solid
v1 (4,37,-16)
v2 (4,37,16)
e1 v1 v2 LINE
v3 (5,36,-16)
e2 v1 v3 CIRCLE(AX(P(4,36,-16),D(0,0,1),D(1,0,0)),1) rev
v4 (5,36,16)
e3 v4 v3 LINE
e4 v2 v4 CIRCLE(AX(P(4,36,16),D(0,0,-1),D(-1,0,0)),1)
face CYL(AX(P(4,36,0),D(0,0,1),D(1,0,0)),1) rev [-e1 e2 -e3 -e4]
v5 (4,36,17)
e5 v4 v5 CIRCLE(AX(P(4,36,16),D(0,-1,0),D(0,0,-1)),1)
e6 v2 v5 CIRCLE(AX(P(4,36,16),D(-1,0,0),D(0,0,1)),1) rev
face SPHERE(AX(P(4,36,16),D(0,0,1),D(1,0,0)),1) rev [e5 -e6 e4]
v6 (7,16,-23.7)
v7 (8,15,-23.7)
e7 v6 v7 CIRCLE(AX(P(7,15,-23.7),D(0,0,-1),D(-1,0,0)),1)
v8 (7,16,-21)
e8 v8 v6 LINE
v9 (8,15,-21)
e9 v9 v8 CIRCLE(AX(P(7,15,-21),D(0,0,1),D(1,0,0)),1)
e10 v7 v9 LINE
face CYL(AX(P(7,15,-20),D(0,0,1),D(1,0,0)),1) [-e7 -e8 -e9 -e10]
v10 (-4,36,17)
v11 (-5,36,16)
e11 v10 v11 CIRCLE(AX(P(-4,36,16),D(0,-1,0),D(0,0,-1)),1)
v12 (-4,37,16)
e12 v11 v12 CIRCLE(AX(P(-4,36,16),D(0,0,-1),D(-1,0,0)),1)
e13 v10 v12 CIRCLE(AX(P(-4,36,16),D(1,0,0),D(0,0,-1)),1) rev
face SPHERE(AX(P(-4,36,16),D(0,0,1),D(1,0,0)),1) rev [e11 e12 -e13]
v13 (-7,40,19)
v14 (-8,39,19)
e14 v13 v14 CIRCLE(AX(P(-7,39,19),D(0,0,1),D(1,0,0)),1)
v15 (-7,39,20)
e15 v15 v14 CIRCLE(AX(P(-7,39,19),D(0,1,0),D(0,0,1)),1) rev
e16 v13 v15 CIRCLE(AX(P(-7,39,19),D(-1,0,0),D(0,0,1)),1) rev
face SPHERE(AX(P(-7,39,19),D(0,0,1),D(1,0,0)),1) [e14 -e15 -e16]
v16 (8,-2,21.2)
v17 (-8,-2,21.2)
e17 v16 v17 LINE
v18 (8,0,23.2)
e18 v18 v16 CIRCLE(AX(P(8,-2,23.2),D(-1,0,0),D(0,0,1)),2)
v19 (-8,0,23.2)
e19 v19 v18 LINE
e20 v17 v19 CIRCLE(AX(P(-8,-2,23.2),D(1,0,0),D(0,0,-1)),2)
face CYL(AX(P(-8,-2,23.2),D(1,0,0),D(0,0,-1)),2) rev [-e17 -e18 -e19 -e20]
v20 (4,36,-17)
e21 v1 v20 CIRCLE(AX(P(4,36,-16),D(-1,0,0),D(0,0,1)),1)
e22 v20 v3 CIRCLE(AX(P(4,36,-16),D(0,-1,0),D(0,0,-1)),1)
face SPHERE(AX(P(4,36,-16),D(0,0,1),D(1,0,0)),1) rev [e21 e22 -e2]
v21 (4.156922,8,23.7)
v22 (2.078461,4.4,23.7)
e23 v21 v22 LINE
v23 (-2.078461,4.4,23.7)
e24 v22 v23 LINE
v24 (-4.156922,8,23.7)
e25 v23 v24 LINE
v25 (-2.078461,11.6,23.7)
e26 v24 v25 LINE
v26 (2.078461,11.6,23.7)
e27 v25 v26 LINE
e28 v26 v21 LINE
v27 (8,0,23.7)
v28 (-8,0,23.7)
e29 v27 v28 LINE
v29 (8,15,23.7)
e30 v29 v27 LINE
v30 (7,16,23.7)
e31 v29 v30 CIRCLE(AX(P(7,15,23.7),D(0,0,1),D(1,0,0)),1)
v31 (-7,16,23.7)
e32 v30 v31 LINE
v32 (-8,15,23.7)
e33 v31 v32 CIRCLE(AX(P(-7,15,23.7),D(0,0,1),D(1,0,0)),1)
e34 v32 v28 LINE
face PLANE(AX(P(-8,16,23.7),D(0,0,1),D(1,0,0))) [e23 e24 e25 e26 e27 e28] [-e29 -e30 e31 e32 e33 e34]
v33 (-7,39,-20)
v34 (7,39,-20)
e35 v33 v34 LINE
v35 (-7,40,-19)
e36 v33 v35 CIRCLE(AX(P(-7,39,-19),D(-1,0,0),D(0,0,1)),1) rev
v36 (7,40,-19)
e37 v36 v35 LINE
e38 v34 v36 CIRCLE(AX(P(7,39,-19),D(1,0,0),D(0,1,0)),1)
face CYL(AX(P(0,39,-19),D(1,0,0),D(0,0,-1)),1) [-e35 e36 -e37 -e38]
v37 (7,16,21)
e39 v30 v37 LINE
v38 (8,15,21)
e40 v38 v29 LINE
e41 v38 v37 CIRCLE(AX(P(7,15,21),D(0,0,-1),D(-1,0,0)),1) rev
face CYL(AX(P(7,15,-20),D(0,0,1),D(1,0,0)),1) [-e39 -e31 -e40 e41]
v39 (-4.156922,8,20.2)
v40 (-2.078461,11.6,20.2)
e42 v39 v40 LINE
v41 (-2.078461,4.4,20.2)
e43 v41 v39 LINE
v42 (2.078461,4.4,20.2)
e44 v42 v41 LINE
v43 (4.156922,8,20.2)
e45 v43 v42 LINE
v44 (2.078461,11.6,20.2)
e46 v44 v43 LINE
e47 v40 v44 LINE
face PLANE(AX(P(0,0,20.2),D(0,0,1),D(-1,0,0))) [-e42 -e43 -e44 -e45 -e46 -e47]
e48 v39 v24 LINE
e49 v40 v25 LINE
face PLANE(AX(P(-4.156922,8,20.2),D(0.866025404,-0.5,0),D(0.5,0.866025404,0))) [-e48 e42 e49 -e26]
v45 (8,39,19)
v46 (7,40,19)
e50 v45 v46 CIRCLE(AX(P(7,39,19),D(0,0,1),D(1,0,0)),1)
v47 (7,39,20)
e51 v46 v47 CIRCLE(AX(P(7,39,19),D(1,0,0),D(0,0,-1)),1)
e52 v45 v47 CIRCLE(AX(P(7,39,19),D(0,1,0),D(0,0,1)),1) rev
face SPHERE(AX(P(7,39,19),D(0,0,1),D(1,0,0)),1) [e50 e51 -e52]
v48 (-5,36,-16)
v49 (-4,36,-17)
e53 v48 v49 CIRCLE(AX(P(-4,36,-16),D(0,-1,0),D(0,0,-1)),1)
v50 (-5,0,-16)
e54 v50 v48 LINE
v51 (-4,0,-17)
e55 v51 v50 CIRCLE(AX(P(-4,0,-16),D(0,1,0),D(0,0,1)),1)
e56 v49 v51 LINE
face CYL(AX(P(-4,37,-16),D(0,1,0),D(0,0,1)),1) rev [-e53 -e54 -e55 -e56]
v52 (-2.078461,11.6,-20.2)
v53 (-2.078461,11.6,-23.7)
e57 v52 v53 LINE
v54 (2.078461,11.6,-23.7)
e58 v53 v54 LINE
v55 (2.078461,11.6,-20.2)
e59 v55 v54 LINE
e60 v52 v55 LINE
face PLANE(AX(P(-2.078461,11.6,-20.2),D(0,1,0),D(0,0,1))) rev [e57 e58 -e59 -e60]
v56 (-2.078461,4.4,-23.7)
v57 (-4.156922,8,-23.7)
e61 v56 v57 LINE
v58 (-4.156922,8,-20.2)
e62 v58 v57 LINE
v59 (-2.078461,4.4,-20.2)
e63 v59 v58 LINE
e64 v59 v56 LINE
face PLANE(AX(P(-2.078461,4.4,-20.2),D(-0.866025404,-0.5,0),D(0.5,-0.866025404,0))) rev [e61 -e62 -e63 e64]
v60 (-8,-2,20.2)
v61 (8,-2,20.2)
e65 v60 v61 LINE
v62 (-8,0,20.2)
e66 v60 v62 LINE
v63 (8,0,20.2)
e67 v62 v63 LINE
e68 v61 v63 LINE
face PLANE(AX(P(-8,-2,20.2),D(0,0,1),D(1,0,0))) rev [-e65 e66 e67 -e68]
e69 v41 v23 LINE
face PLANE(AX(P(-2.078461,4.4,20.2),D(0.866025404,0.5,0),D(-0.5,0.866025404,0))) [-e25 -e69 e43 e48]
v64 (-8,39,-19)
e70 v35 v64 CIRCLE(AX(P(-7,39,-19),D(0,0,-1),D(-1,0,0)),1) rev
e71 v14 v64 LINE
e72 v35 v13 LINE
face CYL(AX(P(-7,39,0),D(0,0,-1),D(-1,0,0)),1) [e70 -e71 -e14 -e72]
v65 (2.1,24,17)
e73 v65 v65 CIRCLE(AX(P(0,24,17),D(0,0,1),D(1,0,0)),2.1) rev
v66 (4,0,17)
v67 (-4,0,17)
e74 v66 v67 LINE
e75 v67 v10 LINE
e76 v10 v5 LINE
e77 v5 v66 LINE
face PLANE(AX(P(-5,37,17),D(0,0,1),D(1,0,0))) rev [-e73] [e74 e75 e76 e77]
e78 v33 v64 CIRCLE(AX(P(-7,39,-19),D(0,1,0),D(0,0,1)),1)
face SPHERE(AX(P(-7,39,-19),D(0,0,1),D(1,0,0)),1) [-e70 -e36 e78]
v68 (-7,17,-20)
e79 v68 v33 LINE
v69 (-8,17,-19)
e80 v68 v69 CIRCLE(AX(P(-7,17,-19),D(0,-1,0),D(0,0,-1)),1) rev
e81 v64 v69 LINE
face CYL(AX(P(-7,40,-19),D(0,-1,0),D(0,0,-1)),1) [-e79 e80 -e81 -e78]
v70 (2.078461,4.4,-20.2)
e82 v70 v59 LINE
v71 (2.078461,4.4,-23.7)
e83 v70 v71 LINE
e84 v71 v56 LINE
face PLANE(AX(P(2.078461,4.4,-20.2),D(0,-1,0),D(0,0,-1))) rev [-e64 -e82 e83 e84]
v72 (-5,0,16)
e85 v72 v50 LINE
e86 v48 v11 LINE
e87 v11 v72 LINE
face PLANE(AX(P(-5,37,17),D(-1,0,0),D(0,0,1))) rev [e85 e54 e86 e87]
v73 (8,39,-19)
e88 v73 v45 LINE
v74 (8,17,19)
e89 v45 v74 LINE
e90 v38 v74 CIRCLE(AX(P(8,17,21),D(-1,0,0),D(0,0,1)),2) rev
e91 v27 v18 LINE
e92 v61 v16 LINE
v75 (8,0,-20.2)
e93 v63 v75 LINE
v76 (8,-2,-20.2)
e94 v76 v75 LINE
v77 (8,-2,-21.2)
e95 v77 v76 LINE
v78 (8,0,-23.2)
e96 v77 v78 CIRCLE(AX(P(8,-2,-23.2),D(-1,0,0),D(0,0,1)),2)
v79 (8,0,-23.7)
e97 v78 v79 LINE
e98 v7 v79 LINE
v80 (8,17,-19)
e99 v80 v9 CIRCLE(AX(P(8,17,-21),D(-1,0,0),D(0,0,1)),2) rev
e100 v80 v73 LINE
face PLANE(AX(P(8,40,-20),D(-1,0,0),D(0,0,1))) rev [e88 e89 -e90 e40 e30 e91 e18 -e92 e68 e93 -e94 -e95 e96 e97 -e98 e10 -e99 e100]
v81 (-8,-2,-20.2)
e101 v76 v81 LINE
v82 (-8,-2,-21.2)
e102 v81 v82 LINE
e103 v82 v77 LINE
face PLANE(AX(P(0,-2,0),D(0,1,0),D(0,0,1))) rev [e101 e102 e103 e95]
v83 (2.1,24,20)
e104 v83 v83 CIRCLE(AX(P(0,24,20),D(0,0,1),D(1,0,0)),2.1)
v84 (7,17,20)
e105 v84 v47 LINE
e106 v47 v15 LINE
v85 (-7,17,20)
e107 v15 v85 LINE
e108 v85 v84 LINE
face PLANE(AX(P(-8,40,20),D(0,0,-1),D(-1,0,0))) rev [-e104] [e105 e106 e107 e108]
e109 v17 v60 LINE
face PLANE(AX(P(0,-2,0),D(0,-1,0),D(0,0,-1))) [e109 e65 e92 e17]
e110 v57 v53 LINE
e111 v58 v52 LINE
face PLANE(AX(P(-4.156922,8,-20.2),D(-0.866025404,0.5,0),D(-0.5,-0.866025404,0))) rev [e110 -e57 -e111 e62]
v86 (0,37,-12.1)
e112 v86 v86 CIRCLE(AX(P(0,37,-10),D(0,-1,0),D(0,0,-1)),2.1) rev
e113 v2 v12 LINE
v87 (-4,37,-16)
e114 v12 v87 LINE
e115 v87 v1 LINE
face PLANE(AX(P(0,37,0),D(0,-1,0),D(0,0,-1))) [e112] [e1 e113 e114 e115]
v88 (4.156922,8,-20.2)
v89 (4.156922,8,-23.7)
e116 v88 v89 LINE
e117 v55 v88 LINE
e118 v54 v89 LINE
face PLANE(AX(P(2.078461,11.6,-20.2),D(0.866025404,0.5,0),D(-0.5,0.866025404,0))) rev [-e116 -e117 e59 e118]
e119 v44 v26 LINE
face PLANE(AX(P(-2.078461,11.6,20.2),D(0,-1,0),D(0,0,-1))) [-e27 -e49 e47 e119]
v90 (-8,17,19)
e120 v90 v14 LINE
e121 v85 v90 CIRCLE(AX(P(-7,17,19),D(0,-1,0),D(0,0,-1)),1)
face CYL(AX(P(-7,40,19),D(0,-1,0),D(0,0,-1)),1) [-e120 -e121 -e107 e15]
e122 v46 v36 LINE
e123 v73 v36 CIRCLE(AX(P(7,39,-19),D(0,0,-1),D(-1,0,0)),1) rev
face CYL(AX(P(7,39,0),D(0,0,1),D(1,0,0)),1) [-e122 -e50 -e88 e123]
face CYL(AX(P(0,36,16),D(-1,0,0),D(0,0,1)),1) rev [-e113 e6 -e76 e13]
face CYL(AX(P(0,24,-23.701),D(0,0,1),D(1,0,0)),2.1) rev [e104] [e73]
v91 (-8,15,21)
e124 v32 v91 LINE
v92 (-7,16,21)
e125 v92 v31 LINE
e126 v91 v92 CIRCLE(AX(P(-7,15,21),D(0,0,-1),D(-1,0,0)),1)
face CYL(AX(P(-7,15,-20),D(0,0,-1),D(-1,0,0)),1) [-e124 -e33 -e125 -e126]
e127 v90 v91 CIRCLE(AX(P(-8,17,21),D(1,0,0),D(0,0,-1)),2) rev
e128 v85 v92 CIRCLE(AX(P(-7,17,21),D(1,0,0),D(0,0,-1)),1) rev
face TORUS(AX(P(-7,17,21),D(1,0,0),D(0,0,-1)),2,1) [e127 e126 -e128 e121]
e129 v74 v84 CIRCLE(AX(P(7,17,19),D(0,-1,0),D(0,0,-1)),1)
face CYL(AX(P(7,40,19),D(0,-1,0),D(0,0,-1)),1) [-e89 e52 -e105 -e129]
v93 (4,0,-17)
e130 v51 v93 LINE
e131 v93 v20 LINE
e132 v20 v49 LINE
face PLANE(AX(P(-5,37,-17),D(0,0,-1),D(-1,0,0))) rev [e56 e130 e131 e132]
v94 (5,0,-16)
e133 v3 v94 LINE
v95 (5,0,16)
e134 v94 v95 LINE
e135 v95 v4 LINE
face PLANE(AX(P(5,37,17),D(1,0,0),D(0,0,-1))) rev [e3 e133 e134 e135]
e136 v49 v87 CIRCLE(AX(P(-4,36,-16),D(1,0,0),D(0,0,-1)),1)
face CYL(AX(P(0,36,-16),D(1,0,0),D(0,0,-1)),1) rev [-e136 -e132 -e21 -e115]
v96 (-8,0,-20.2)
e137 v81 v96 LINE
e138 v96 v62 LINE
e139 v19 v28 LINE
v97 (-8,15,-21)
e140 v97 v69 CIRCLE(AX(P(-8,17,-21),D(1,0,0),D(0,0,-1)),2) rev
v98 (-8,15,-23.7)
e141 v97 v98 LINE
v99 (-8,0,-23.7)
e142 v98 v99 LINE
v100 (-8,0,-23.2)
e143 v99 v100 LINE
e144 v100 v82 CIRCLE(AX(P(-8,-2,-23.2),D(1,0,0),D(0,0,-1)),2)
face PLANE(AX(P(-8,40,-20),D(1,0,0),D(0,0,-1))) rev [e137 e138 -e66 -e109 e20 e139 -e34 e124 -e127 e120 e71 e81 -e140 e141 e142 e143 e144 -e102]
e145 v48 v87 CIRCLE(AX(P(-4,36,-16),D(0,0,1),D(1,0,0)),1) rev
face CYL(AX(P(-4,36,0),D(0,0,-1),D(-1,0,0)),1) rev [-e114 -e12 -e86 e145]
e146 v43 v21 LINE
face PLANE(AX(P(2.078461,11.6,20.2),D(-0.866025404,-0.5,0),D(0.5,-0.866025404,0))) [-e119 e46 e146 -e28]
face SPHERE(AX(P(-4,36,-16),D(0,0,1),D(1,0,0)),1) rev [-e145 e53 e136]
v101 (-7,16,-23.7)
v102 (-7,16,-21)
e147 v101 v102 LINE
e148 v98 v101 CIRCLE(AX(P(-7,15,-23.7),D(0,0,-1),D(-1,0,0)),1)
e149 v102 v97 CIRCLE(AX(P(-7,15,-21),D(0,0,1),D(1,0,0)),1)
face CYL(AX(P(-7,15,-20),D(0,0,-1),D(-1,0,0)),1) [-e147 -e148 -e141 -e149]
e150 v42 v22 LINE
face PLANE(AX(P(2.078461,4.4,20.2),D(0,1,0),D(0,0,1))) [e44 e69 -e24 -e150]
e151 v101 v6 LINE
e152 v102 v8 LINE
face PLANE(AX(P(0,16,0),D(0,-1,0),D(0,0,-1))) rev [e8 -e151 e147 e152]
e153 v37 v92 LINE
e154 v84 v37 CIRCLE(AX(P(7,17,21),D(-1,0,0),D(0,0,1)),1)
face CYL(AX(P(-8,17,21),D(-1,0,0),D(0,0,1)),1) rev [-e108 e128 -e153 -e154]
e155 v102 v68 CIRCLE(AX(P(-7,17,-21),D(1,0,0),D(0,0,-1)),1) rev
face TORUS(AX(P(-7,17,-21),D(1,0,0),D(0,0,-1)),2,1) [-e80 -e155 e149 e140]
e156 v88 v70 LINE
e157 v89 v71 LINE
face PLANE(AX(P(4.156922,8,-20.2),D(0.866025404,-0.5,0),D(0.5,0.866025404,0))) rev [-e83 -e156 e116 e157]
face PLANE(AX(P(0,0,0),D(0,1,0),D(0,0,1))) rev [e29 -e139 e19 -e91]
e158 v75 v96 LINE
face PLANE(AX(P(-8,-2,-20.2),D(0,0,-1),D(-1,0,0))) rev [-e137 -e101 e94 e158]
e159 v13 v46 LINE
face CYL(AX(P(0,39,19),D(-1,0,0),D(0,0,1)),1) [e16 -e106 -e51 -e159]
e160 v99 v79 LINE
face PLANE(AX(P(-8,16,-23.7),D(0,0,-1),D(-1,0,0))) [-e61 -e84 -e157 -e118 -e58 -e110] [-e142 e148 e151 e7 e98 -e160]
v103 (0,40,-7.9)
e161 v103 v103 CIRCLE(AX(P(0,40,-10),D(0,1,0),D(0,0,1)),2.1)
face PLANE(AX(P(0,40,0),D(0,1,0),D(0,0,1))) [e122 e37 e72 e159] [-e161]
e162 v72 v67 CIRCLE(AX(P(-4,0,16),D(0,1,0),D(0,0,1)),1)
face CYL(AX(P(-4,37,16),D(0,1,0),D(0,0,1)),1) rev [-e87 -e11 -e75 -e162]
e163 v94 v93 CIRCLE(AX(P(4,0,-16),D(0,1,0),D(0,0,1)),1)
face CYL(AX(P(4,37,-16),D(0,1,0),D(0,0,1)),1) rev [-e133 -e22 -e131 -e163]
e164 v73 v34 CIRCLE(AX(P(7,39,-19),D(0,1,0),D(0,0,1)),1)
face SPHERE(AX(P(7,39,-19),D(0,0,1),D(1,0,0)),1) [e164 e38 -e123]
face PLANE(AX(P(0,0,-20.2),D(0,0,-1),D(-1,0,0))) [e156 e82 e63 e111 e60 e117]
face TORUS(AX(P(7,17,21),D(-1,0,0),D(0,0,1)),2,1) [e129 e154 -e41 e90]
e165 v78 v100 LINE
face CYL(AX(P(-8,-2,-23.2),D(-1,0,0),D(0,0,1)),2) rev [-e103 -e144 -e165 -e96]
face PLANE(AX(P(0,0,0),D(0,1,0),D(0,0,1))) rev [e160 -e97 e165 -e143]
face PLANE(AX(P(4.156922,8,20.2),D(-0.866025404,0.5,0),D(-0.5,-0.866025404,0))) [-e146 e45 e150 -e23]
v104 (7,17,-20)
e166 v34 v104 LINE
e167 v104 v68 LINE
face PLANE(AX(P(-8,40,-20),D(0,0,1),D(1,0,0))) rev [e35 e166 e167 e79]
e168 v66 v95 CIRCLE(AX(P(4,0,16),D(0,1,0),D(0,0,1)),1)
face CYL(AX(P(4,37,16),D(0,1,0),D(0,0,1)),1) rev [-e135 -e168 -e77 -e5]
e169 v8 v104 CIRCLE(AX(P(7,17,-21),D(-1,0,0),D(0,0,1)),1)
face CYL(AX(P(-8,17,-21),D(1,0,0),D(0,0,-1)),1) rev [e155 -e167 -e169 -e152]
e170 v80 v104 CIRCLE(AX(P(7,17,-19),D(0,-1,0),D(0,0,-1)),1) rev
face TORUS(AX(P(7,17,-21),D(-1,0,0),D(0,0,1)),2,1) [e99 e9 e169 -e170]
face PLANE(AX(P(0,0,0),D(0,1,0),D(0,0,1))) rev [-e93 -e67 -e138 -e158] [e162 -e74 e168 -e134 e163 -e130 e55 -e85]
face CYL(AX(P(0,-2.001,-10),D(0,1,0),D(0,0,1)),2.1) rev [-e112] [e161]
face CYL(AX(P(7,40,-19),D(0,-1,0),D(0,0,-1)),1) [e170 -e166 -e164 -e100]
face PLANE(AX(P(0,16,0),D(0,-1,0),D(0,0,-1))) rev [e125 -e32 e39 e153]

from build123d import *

# Parameters (mm, degrees)
SKETCH1_W           = 16
SKETCH1_H           = 40
BOSS_EXTRUDE1_DEPTH = 40
SKETCH2_W           = 16
SKETCH2_H           = 3.7
BOSS_EXTRUDE2_DEPTH = 16
SKETCH5_W           = 10
SKETCH5_H           = 34
CUT_EXTRUDE3_DEPTH  = 37
FILLET1_R           = 1
FILLET2_R           = 1
CUT_EXTRUDE6_DEPTH  = 3.5
SKETCH9_W           = 16
SKETCH9_H           = 1
BOSS_EXTRUDE3_DEPTH = 2
CUT_EXTRUDE7_REACH  = 61.78
SKETCH12_R          = 2.1
CUT_EXTRUDE8_REACH  = 50.884
SKETCH13_R          = 2.1
FILLET3_R           = 2


with BuildPart() as part:
    # Sketch1 → Boss-Extrude1 (new body)
    with BuildSketch(Plane(origin=(0, 0, 0), x_dir=(1, 0, 0), z_dir=(0, 1, 0))):
        Rectangle(SKETCH1_W, SKETCH1_H)
    extrude(amount=BOSS_EXTRUDE1_DEPTH)

    # Sketch2 → Boss-Extrude2 (add)
    with BuildSketch(Plane.XZ):
        with Locations((0, 21.85)):
            Rectangle(SKETCH2_W, SKETCH2_H)
        with Locations((0, -21.85)):
            Rectangle(SKETCH2_W, SKETCH2_H)
    extrude(amount=-BOSS_EXTRUDE2_DEPTH)

    # Sketch5 → Cut-Extrude3 (cut)
    with BuildSketch(Plane.XZ):
        Rectangle(SKETCH5_W, SKETCH5_H)
    extrude(amount=-CUT_EXTRUDE3_DEPTH, mode=Mode.SUBTRACT)

    # Fillet1
    fillet1_edges = [part.edges().sort_by_distance(p)[0] for p in [
        (8, 40, 0),
        (0, 40, -20),
        (-8, 16, 21.85),
        (8, 16, 21.85),
        (0, 16, 20),
        (-8, 16, -21.85),
        (0, 16, -20),
        (8, 16, -21.85),
        (-8, 40, 0),
        (0, 40, 20),
        (-8, 28, -20),
        (8, 28, -20),
        (8, 28, 20),
        (-8, 28, 20),
    ]]
    fillet(fillet1_edges, radius=FILLET1_R)

    # Fillet2
    fillet2_edges = [part.edges().sort_by_distance(p)[0] for p in [
        (-5, 37, 0),
        (-5, 18.5, -17),
        (0, 37, 17),
        (-5, 18.5, 17),
        (5, 37, 0),
        (5, 18.5, 17),
        (0, 37, -17),
        (5, 18.5, -17),
    ]]
    fillet(fillet2_edges, radius=FILLET2_R)

    # Sketch3 → Cut-Extrude6 (cut)
    with BuildSketch(Plane(origin=(0, 0, -23.7), x_dir=(-1, 0, 0), z_dir=(0, 0, -1))):
        Polygon((2.078460969, 11.6), (-2.078460969, 11.6), (-4.156921938, 8), (-2.078460969, 4.4), (2.078460969, 4.4), (4.156921938, 8), align=None)
    cut_extrude6 = extrude(amount=-CUT_EXTRUDE6_DEPTH, mode=Mode.SUBTRACT)

    # Mirror2: Cut-Extrude6 across plane
    add(cut_extrude6.mirror(Plane.XY), mode=Mode.SUBTRACT)

    # Sketch9 → Boss-Extrude3 (add)
    with BuildSketch(Plane.XZ):
        with Locations((0, 20.7)):
            Rectangle(SKETCH9_W, SKETCH9_H)
        with Locations((0, -20.7)):
            Rectangle(SKETCH9_W, SKETCH9_H)
    extrude(amount=BOSS_EXTRUDE3_DEPTH)

    # Sketch12 → Cut-Extrude7 (cut, up to next)
    with BuildSketch(Plane.XY.offset(20), mode=Mode.PRIVATE) as cut_extrude7_sk1:
        with Locations((0, 24)):
            Circle(SKETCH12_R)
    cut_extrude7_tool1 = extrude(cut_extrude7_sk1.sketch, amount=-CUT_EXTRUDE7_REACH, mode=Mode.PRIVATE) & part.part
    add(cut_extrude7_tool1.solids().sort_by_distance((0, 24, 20))[0], mode=Mode.SUBTRACT)

    # Sketch13 → Cut-Extrude8 (cut, up to next)
    with BuildSketch(Plane(origin=(0, 40, 0), x_dir=(1, 0, 0), z_dir=(0, 1, 0)), mode=Mode.PRIVATE) as cut_extrude8_sk1:
        with Locations(Location((0, 10, 0), (0, 0, 270))):
            Circle(SKETCH13_R)
    cut_extrude8_tool1 = extrude(cut_extrude8_sk1.sketch, amount=-CUT_EXTRUDE8_REACH, mode=Mode.PRIVATE) & part.part
    add(cut_extrude8_tool1.solids().sort_by_distance((0, 40, -10))[0], mode=Mode.SUBTRACT)

    # Fillet3
    fillet3_edges = [part.edges().sort_by_distance(p)[0] for p in [
        (0, 0, 21.2),
        (0, 0, -21.2),
    ]]
    fillet(fillet3_edges, radius=FILLET3_R - 0.0001)  # a hair under: the kernel refuses the full size


solid = part.part
